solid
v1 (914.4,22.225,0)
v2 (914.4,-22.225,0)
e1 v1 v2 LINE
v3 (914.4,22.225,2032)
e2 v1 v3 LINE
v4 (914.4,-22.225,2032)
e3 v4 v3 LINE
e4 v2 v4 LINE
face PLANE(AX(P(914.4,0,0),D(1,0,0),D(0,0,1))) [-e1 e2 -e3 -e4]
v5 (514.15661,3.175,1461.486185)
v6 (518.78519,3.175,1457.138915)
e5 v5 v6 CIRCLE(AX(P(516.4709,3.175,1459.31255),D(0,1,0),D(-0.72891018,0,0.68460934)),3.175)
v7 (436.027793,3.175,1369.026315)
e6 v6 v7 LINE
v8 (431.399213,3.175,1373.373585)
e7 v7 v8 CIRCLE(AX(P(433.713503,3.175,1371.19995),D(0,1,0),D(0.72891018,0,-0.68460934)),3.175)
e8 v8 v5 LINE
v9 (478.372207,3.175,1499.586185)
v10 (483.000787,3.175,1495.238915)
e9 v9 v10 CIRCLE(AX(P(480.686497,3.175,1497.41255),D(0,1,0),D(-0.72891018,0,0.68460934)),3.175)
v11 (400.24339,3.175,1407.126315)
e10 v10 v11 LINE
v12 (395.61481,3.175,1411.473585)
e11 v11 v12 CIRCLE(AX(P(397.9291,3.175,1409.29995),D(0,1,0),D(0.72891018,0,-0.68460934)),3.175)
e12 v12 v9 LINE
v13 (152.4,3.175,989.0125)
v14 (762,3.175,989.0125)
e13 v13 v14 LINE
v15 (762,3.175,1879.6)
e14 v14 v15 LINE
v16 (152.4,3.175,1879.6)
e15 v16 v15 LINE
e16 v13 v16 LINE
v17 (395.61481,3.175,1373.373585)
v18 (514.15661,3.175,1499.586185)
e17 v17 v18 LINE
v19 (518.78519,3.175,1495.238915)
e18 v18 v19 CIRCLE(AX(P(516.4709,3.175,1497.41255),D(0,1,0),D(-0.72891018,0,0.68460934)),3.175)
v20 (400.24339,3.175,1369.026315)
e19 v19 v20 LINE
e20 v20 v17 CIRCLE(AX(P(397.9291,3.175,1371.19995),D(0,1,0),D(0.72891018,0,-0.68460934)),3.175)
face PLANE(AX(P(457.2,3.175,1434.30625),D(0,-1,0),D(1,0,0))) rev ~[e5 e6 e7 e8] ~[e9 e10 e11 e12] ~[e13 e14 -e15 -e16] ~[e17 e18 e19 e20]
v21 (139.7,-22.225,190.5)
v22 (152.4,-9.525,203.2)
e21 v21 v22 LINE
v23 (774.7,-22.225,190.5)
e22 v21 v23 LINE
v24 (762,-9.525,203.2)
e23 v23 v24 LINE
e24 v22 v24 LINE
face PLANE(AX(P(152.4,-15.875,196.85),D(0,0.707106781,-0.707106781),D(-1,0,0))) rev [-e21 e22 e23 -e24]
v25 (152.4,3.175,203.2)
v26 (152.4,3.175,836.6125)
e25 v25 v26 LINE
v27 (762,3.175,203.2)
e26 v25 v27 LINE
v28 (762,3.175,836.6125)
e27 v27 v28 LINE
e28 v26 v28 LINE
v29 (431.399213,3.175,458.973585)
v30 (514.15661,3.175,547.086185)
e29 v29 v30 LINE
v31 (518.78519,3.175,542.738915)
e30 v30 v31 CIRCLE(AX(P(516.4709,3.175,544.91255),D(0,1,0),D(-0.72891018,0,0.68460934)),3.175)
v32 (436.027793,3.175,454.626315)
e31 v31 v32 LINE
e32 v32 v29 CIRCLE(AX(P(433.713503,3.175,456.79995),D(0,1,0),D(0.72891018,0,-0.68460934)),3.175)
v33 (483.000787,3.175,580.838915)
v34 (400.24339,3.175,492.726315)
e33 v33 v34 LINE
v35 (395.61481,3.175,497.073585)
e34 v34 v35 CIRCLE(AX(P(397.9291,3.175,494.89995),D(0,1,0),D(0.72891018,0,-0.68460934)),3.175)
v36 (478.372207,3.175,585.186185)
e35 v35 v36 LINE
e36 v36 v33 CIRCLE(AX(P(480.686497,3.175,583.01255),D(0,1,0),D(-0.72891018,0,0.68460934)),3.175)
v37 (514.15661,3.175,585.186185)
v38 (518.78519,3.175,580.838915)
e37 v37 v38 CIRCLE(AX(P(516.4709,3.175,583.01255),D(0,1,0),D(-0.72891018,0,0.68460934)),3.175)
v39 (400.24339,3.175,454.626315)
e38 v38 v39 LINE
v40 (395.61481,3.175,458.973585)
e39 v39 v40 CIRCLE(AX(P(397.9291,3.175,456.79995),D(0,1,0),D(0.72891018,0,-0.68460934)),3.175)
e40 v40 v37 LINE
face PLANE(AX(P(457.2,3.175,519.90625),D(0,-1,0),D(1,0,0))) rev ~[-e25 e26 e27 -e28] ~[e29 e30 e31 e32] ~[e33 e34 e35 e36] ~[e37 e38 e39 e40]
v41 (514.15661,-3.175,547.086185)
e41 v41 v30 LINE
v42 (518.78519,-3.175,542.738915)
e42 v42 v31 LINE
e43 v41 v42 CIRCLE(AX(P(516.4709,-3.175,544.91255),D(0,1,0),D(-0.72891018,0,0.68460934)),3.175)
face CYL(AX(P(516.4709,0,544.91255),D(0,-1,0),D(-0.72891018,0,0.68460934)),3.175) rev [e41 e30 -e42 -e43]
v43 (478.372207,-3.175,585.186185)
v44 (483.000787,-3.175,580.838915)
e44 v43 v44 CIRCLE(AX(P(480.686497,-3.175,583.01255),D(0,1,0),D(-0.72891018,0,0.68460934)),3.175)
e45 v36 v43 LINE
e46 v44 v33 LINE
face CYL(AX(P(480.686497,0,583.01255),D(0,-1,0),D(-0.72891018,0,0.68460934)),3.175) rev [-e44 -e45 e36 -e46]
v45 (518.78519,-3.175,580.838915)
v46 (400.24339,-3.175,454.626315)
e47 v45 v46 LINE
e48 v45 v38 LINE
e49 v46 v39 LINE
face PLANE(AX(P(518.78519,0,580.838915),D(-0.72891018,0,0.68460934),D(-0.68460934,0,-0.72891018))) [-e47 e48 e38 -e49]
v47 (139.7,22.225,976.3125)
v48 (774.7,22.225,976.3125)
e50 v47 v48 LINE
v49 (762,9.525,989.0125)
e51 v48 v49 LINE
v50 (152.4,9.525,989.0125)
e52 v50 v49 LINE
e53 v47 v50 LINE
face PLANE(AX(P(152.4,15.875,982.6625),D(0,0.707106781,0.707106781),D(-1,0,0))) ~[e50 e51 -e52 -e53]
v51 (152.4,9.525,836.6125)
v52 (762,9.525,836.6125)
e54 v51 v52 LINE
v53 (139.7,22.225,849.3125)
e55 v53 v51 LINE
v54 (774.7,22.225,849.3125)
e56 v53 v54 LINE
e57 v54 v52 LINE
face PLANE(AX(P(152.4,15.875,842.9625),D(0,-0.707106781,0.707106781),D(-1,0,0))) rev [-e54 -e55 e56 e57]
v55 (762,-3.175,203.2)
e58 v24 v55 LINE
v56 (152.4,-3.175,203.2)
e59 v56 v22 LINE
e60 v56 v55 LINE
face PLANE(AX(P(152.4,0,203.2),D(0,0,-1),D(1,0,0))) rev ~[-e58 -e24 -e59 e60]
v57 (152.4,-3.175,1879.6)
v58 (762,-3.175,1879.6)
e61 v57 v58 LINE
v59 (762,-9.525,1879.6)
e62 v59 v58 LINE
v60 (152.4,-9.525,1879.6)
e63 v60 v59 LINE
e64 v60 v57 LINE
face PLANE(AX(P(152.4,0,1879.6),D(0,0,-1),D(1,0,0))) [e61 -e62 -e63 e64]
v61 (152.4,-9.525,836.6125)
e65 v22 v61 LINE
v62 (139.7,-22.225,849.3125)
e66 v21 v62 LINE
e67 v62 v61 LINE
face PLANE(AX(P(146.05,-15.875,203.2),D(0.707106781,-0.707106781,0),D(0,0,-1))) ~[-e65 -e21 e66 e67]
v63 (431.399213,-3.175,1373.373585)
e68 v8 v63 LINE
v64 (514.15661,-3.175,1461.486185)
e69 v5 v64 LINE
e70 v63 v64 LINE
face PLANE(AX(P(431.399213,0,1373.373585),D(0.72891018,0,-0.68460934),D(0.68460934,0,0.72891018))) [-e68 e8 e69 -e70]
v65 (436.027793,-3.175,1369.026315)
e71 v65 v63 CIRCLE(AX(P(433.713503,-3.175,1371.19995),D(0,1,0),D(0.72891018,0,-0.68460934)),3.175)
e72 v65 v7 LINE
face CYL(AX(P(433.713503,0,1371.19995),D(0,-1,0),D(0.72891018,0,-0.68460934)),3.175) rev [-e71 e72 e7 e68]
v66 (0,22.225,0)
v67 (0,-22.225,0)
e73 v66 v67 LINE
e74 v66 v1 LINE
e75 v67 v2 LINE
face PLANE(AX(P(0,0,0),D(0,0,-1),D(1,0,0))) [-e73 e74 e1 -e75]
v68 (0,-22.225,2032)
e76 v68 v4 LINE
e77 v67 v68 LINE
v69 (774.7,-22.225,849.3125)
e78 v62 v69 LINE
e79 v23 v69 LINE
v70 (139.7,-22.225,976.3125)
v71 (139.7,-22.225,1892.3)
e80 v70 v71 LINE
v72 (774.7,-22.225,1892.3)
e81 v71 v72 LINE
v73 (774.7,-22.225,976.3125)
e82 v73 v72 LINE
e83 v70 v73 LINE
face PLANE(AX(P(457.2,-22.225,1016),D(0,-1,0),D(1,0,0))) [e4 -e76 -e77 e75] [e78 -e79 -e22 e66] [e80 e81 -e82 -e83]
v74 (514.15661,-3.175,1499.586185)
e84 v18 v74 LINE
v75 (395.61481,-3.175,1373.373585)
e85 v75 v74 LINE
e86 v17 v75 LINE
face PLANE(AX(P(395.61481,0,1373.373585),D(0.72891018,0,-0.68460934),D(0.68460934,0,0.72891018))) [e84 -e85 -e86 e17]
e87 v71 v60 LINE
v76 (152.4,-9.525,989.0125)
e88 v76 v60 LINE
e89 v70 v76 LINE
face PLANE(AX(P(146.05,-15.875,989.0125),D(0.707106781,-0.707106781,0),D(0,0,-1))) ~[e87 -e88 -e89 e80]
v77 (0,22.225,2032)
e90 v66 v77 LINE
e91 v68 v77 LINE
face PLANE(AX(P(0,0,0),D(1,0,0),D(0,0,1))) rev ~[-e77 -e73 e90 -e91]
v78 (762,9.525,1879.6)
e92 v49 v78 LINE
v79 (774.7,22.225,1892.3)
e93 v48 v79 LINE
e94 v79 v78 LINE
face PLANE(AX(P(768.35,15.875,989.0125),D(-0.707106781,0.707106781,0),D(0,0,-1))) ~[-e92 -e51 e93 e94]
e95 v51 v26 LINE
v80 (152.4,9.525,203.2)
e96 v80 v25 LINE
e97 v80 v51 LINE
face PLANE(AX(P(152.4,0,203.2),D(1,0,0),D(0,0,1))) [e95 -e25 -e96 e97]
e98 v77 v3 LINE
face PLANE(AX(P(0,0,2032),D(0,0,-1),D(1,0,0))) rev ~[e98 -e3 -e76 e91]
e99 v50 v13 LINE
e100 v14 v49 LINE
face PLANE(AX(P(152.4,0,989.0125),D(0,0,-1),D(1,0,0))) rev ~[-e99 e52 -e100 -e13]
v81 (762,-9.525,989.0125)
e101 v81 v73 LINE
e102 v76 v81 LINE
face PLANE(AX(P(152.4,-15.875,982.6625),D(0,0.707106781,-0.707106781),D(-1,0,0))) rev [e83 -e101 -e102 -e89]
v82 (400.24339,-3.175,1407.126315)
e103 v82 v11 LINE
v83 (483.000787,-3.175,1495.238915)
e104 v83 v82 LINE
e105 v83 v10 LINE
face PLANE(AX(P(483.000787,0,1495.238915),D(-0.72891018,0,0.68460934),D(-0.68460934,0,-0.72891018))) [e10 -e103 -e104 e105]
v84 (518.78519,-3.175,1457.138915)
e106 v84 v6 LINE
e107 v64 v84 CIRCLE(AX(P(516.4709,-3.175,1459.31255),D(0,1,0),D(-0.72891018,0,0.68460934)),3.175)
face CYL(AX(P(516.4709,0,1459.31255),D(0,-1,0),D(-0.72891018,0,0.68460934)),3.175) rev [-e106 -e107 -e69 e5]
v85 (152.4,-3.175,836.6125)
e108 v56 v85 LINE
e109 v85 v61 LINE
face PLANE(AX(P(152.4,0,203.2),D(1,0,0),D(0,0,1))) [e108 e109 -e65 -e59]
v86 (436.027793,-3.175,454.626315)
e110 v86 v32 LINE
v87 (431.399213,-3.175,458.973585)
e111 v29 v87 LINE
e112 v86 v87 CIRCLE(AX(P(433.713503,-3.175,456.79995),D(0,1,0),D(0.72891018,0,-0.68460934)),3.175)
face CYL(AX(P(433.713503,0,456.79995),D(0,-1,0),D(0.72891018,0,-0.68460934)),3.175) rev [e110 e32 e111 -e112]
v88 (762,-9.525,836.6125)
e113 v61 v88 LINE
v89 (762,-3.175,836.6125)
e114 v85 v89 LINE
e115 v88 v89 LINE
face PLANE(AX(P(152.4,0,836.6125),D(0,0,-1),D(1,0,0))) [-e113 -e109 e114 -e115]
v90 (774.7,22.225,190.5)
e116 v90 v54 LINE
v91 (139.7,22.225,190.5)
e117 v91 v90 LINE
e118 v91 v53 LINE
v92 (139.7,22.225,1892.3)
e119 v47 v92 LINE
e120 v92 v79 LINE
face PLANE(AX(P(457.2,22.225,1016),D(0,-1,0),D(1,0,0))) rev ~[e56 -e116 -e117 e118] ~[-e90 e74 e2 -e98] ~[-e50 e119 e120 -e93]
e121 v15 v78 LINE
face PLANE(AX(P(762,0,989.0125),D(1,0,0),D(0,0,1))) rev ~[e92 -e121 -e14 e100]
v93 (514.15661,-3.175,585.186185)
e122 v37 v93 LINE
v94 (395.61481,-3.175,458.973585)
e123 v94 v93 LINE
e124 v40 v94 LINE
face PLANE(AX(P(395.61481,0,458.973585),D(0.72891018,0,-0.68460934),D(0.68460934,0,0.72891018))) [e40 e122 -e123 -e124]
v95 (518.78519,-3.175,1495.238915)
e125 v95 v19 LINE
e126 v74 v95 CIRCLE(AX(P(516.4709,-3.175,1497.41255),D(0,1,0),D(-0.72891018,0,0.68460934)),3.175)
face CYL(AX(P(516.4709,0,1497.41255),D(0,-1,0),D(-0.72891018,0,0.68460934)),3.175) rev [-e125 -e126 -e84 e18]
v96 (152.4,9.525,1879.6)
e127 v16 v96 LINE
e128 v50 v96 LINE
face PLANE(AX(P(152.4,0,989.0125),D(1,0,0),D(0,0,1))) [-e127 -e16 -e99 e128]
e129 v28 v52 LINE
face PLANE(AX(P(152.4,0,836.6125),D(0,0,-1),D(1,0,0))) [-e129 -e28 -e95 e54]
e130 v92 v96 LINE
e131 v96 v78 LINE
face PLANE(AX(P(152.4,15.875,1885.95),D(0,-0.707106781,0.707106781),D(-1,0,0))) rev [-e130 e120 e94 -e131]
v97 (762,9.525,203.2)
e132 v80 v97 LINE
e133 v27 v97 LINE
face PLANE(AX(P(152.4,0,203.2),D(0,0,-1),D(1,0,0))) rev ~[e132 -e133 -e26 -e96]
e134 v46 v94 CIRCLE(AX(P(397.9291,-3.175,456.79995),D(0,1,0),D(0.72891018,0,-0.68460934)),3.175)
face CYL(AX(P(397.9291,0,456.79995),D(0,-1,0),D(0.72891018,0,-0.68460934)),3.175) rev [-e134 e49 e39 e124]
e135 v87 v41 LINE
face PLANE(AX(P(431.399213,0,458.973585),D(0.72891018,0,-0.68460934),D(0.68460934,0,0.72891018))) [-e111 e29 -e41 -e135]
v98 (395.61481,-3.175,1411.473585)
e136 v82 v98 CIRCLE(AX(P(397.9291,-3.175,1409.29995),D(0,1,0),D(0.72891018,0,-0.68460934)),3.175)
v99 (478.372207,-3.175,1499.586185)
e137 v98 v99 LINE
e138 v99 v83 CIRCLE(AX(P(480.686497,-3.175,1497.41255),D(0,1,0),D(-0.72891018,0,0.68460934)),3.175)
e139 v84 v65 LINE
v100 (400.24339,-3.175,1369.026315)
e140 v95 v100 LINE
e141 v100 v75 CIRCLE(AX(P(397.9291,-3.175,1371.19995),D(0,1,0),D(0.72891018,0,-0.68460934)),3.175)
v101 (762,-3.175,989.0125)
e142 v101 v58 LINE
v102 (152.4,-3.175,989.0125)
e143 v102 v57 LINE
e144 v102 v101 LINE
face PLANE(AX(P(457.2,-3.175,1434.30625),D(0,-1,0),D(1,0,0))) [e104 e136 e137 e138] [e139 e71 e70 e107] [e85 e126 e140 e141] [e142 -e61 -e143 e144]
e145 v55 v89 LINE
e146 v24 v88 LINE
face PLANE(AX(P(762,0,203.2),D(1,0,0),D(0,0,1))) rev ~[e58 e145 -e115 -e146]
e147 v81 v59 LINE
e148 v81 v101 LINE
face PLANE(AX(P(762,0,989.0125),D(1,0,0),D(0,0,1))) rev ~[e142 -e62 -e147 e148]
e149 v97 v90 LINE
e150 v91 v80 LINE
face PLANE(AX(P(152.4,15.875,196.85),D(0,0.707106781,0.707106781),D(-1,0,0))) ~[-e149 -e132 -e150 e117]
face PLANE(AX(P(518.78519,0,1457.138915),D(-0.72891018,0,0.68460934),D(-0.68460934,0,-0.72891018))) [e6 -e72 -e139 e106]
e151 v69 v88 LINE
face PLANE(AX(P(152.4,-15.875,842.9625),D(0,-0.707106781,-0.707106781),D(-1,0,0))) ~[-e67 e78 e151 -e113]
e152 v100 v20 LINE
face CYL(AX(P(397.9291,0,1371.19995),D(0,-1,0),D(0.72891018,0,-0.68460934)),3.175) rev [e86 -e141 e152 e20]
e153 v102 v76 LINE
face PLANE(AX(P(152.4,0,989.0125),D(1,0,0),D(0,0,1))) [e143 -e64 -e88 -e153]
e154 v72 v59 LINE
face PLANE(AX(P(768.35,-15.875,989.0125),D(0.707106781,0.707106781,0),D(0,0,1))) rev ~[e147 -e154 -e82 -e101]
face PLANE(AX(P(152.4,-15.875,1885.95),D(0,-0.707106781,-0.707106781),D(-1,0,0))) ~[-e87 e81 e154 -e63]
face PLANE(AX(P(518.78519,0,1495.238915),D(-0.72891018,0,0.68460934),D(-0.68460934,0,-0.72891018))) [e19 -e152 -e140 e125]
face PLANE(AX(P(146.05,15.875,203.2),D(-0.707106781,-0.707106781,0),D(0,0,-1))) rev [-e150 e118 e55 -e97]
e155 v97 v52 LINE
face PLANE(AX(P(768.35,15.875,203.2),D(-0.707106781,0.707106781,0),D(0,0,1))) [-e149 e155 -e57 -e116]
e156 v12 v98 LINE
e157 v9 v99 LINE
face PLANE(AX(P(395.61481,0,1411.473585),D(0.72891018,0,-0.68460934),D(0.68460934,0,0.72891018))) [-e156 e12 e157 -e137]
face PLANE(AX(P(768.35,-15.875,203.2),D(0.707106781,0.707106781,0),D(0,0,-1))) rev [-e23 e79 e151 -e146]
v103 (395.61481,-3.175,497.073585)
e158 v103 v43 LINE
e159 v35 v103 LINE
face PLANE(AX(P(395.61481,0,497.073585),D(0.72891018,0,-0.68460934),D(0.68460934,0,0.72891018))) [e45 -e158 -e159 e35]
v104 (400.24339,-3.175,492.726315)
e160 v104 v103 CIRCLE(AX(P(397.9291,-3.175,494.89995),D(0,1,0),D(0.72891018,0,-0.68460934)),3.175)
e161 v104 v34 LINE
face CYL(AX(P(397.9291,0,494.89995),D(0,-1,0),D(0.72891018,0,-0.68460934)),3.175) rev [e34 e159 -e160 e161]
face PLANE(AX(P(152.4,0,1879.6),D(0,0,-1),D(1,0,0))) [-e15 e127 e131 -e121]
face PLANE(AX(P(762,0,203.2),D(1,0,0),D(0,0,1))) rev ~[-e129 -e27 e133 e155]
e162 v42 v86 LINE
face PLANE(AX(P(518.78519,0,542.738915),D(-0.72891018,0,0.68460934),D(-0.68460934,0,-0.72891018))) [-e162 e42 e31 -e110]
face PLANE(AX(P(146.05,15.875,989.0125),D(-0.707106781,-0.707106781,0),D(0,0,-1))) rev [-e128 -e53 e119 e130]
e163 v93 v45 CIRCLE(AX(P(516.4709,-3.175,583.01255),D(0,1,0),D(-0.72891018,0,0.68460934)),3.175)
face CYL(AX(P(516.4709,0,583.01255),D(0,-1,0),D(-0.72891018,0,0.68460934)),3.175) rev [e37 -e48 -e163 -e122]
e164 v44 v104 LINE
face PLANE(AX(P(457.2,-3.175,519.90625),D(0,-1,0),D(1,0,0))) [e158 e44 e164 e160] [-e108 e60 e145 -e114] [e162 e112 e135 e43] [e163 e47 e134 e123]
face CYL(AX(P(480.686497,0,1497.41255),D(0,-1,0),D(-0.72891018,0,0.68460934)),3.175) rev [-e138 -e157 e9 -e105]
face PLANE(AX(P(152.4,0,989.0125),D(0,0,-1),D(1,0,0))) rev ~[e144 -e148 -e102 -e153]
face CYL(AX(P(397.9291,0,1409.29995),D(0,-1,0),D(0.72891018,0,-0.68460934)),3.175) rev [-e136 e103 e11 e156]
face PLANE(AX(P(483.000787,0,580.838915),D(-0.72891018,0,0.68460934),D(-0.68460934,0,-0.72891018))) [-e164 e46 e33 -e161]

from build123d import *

# Parameters (mm, degrees)
F0_W          = 914.4
F0_H          = 2032
F0_W_2        = 609.6
F0_H_2        = 633.4125
F0_H_3        = 890.5875
F1_DEPTH      = 22.225
F1_DEPTH_BACK = 22.225
F2_W          = 609.6
F2_H          = 890.5875
F2_H_2        = 633.4125
F3_DEPTH      = 3.175
F3_DEPTH_BACK = 3.175
F4_SIZE       = 12.7


# Not quite as in the source:
# - a length typed as a fraction of an inch, garbled in the dataset ("3 / 203.2 mm" for 3/8 in), is restored


with BuildPart() as f1:
    # F0 (on Front) → F1 (new body, two sides)
    with BuildSketch(Plane.XZ) as f1_sk:
        with Locations((457.2, 1016)):
            Rectangle(F0_W, F0_H)
        with Locations((457.2, 519.90625)):
            Rectangle(F0_W_2, F0_H_2, mode=Mode.SUBTRACT)
        with Locations((457.2, 1434.30625)):
            Rectangle(F0_W_2, F0_H_3, mode=Mode.SUBTRACT)
    extrude(amount=F1_DEPTH)
    extrude(f1_sk.sketch, amount=-F1_DEPTH_BACK)

    # F2 (on Front) → F3 (join, two sides)
    with BuildSketch(Plane.XZ) as f3_sk:
        with Locations((457.2, 1434.30625)):
            Rectangle(F2_W, F2_H)
        with BuildLine():
            Line((395.6148101771, 1373.3735846555), (514.1566101771, 1499.5861846555))
            ThreePointArc((514.1566101771, 1499.5861846555), (518.6445346555, 1499.7268398229), (518.7851898229, 1495.2389153445))
            Line((518.7851898229, 1495.2389153445), (400.2433898229, 1369.0263153445))
            ThreePointArc((400.2433898229, 1369.0263153445), (395.7554653445, 1368.8856601771), (395.6148101771, 1373.3735846555))
        make_face(mode=Mode.SUBTRACT)
        with BuildLine():
            Line((395.6148101771, 1411.4735846555), (478.3722068767, 1499.5861846555))
            ThreePointArc((478.3722068767, 1499.5861846555), (482.8601313551, 1499.7268398229), (483.0007865224, 1495.2389153445))
            Line((483.0007865224, 1495.2389153445), (400.2433898229, 1407.1263153445))
            ThreePointArc((400.2433898229, 1407.1263153445), (395.7554653445, 1406.9856601771), (395.6148101771, 1411.4735846555))
        make_face(mode=Mode.SUBTRACT)
        with BuildLine():
            Line((431.3992134776, 1373.3735846555), (514.1566101771, 1461.4861846555))
            ThreePointArc((514.1566101771, 1461.4861846555), (518.6445346555, 1461.6268398229), (518.7851898229, 1457.1389153445))
            Line((518.7851898229, 1457.1389153445), (436.0277931233, 1369.0263153445))
            ThreePointArc((436.0277931233, 1369.0263153445), (431.5398686449, 1368.8856601771), (431.3992134776, 1373.3735846555))
        make_face(mode=Mode.SUBTRACT)
        with Locations((457.2, 519.90625)):
            Rectangle(F2_W, F2_H_2)
        with BuildLine():
            Line((395.6148101771, 497.0735846555), (478.3722068767, 585.1861846555))
            ThreePointArc((478.3722068767, 585.1861846555), (482.8601313551, 585.3268398229), (483.0007865224, 580.8389153445))
            Line((483.0007865224, 580.8389153445), (400.2433898229, 492.7263153445))
            ThreePointArc((400.2433898229, 492.7263153445), (395.7554653445, 492.5856601771), (395.6148101771, 497.0735846555))
        make_face(mode=Mode.SUBTRACT)
        with BuildLine():
            Line((395.6148101771, 458.9735846555), (514.1566101771, 585.1861846555))
            ThreePointArc((514.1566101771, 585.1861846555), (518.6445346555, 585.3268398229), (518.7851898229, 580.8389153445))
            Line((518.7851898229, 580.8389153445), (400.2433898229, 454.6263153445))
            ThreePointArc((400.2433898229, 454.6263153445), (395.7554653445, 454.4856601771), (395.6148101771, 458.9735846555))
        make_face(mode=Mode.SUBTRACT)
        with BuildLine():
            Line((431.3992134776, 458.9735846555), (514.1566101771, 547.0861846555))
            ThreePointArc((514.1566101771, 547.0861846555), (518.6445346555, 547.2268398229), (518.7851898229, 542.7389153445))
            Line((518.7851898229, 542.7389153445), (436.0277931233, 454.6263153445))
            ThreePointArc((436.0277931233, 454.6263153445), (431.5398686449, 454.4856601771), (431.3992134776, 458.9735846555))
        make_face(mode=Mode.SUBTRACT)
    extrude(amount=F3_DEPTH)
    extrude(f3_sk.sketch, amount=-F3_DEPTH_BACK)

    # F4
    f4_edges = [f1.edges().sort_by_distance(p)[0] for p in [
        (457.2, -22.225, 1879.6),
        (762, -22.225, 1434.30625),
        (457.2, -22.225, 989.0125),
        (152.4, -22.225, 1434.30625),
        (457.2, -22.225, 836.6125),
        (152.4, -22.225, 519.90625),
        (762, -22.225, 519.90625),
        (457.2, -22.225, 203.2),
        (457.2, 22.225, 836.6125),
        (762, 22.225, 519.90625),
        (152.4, 22.225, 519.90625),
        (457.2, 22.225, 203.2),
        (152.4, 22.225, 1434.30625),
        (457.2, 22.225, 989.0125),
        (762, 22.225, 1434.30625),
        (457.2, 22.225, 1879.6),
    ]]
    chamfer(f4_edges, length=F4_SIZE)


solid = f1.part
